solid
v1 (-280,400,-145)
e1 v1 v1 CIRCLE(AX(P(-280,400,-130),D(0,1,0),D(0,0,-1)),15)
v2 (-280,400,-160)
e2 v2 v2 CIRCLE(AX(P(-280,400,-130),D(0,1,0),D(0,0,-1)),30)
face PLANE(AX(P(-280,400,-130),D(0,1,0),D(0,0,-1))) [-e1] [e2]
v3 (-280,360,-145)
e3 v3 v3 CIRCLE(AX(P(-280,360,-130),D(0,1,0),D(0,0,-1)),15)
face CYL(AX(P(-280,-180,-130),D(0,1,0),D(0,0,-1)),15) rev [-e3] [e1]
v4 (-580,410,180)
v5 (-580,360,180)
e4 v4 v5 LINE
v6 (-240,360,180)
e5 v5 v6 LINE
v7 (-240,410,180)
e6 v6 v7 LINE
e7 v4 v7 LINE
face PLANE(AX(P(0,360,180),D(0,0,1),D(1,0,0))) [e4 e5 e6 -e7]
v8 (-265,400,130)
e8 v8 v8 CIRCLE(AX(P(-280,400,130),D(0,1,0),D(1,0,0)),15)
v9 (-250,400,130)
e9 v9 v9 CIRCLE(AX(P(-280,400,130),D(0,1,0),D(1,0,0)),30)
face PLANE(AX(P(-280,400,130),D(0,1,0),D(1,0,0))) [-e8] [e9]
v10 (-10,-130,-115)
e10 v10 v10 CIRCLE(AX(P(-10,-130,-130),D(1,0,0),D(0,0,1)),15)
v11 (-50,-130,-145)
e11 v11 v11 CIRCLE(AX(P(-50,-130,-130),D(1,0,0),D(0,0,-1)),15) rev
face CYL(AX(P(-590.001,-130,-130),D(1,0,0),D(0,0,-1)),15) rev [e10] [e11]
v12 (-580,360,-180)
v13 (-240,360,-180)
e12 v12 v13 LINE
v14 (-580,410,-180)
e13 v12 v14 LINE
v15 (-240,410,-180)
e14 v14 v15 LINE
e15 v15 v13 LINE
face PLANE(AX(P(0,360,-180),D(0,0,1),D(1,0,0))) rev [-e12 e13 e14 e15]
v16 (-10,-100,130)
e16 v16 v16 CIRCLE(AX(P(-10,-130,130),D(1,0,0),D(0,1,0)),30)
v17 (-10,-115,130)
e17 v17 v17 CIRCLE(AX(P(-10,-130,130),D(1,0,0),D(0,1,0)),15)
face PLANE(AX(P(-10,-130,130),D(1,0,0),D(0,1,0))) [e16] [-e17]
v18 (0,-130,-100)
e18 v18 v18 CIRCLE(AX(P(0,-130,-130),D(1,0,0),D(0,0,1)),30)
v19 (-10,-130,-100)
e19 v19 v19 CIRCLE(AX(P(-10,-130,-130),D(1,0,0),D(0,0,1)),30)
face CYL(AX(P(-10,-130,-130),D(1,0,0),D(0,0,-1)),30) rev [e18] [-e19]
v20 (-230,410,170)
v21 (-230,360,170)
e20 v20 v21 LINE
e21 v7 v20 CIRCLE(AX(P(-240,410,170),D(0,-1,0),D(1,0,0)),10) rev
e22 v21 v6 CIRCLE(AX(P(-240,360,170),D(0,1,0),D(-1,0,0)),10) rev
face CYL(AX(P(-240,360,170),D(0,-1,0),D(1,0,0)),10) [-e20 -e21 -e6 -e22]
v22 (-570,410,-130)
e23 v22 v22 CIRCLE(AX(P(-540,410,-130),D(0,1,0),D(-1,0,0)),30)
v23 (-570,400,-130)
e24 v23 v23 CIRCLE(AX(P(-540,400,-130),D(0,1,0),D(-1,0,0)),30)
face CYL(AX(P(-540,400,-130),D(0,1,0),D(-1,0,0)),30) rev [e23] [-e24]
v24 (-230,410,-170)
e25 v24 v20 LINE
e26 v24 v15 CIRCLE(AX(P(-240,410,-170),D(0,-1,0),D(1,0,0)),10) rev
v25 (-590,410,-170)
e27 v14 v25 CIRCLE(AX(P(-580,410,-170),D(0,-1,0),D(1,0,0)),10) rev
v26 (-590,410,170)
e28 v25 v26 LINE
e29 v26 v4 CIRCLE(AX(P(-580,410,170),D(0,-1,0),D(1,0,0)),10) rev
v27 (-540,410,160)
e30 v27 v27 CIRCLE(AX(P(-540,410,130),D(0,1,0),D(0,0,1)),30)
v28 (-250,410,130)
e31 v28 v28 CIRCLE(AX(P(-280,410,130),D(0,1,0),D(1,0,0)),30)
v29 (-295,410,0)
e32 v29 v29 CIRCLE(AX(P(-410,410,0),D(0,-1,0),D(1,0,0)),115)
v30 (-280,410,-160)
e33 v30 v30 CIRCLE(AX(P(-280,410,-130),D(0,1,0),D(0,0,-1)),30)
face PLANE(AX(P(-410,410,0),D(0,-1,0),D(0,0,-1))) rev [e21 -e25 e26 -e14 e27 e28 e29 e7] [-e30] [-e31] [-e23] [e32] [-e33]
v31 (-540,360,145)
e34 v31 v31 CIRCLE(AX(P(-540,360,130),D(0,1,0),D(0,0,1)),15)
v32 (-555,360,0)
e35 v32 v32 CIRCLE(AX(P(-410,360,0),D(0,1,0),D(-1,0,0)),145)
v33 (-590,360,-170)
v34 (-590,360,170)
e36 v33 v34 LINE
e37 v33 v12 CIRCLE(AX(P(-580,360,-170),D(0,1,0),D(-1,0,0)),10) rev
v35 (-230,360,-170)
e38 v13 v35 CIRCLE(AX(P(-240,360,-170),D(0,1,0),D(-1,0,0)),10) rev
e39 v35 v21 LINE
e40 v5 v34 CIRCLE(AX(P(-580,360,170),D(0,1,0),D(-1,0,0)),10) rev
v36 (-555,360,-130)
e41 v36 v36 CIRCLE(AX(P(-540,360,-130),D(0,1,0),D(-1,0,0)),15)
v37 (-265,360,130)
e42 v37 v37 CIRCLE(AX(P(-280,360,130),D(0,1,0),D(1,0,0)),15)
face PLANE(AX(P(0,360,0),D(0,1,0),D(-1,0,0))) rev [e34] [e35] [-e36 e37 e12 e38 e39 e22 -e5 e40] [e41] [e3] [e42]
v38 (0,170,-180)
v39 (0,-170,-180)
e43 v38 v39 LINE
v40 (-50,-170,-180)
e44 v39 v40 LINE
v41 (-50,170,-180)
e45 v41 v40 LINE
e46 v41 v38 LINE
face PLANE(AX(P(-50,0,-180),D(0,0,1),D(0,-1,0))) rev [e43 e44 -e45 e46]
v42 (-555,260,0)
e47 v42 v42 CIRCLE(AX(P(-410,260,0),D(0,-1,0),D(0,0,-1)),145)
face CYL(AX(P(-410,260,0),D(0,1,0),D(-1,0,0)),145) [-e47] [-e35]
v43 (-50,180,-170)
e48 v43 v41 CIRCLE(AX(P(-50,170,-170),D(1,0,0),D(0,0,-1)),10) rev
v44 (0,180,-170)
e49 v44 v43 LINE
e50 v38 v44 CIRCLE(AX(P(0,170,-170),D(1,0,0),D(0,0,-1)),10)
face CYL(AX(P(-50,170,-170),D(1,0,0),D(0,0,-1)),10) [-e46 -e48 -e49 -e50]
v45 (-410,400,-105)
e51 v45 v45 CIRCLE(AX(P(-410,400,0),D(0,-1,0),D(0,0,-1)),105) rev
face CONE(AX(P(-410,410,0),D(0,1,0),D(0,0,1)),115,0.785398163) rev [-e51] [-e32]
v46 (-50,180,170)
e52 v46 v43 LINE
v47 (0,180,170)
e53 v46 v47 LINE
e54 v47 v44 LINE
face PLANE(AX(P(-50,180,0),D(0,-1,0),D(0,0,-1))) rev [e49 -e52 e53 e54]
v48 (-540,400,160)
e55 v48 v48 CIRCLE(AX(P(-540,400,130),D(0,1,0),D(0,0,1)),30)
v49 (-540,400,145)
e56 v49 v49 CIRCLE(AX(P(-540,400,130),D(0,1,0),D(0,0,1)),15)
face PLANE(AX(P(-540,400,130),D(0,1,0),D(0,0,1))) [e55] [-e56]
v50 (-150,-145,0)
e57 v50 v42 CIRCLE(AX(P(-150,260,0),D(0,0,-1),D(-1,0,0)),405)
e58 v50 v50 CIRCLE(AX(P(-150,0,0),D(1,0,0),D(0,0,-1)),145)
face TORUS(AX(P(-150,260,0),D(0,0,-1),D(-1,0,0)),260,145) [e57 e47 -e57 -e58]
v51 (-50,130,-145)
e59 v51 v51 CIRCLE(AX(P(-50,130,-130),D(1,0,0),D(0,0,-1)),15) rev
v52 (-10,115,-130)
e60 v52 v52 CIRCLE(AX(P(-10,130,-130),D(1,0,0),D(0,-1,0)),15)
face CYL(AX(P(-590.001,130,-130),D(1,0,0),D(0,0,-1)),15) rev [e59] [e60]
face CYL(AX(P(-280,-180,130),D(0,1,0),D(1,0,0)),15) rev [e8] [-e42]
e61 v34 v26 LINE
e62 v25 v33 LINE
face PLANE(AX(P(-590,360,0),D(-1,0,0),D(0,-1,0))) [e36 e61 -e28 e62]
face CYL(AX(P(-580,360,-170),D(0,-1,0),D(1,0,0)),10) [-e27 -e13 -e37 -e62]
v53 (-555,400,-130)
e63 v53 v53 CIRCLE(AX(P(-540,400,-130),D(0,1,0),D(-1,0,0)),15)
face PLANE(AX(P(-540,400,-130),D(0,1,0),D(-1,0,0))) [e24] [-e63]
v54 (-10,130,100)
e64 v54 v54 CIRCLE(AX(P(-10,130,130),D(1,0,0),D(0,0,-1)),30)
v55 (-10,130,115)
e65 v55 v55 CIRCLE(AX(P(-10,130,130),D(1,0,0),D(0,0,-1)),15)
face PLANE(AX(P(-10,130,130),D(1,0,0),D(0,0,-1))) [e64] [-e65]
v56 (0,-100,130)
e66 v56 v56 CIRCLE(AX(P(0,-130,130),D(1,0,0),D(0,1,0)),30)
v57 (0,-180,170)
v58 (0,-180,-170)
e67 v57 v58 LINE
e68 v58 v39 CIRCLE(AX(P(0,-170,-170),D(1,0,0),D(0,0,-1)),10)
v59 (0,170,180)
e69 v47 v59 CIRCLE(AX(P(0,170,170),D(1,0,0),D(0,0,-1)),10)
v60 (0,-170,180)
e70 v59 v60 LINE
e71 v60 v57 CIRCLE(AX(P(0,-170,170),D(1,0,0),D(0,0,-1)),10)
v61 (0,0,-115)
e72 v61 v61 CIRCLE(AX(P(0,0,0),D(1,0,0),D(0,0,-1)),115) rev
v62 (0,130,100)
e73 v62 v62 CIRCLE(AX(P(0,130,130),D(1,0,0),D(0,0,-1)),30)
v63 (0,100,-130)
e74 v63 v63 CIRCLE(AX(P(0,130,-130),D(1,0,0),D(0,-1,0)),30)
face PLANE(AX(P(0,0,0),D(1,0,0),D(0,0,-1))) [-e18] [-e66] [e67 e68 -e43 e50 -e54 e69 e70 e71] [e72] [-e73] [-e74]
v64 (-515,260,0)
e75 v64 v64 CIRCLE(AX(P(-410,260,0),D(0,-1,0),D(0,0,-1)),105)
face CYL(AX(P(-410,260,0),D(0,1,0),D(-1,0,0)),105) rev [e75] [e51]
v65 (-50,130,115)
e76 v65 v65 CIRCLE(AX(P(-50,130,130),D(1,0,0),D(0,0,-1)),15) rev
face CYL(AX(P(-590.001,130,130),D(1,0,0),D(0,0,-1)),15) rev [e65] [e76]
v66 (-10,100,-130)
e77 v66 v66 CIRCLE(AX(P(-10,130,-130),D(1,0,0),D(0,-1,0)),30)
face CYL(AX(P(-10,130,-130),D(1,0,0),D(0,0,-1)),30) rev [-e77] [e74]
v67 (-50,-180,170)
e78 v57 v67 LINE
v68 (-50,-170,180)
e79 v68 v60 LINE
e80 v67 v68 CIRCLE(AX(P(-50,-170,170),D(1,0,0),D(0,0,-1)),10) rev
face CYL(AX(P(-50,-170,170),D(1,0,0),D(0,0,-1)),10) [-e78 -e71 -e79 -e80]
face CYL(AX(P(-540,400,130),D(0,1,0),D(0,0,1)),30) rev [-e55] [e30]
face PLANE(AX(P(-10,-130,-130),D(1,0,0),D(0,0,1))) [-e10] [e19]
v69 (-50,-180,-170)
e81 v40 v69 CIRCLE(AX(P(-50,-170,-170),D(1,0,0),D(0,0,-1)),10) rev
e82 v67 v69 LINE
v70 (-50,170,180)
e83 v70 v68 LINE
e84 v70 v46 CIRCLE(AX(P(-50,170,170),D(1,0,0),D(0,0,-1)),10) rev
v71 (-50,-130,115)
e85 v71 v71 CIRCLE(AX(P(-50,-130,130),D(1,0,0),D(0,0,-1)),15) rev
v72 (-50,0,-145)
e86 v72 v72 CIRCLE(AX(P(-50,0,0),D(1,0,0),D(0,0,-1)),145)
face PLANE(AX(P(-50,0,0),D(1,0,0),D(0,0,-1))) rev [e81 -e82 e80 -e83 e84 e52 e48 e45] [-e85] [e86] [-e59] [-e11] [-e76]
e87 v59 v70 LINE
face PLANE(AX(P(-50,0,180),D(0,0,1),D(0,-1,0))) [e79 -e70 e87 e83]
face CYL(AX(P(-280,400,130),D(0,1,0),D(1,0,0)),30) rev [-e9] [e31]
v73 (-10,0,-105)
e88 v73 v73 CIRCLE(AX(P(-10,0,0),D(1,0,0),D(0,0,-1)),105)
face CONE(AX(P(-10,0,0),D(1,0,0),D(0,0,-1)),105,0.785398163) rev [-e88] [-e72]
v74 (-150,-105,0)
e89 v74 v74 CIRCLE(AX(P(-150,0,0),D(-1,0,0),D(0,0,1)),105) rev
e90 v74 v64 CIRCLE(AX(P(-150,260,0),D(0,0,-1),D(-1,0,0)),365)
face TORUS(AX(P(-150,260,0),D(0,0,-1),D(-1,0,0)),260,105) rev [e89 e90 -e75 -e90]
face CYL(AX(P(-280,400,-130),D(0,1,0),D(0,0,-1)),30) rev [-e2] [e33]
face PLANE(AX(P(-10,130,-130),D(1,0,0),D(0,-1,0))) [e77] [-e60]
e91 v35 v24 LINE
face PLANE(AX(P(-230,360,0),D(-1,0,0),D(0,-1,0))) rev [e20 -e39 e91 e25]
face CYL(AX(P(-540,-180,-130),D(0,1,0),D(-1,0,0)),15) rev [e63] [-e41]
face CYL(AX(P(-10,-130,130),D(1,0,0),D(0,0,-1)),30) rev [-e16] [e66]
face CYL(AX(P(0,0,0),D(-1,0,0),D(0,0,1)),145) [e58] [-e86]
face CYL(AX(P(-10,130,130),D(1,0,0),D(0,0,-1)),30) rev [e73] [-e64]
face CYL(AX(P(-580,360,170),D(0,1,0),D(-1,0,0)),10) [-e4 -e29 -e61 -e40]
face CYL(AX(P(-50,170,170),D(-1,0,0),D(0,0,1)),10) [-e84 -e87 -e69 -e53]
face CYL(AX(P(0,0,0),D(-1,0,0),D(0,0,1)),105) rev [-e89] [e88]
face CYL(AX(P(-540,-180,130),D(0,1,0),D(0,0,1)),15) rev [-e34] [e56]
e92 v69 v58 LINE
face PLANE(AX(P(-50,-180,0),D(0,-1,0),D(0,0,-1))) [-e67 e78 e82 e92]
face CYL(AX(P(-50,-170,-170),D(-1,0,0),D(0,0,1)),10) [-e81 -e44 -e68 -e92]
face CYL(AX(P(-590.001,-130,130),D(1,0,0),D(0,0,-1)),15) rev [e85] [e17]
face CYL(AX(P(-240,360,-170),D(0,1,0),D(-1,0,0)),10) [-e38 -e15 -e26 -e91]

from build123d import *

# Parameters (mm, degrees)
SKETCH2_R                 = 145
SKETCH2_R_2               = 105
BOSS_EXTRUDE1_START       = -50
SKETCH3_W                 = 360
SKETCH3_H                 = 360
SKETCH3_R                 = 145
BOSS_EXTRUDE1_DEPTH       = 50
FILLET1_R                 = 10
SKETCH4_W                 = 360
SKETCH4_H                 = 360
SKETCH4_R                 = 145
BOSS_EXTRUDE2_DEPTH       = 50
FILLET2_R                 = 10
SKETCH5_R                 = 30
CUT_EXTRUDE1_DEPTH        = 10
CUT_EXTRUDE2_REACH        = 734.735
SKETCH7_R                 = 15
CIRPATTERN1_COUNT         = 4
SKETCH8_R                 = 30
CUT_EXTRUDE3_DEPTH        = 10
SKETCH9_R                 = 15
CUT_EXTRUDE4_DEPTH        = 847.69947443
CIRPATTERN4_START         = 360
CIRPATTERN4_OUTLINE_R     = 15
CIRPATTERN4_DEPTH         = 50
CIRPATTERN4_START_2       = 400
CIRPATTERN4_2_OUTLINE_R   = 30
CIRPATTERN4_2_OUTLINE_R_2 = 15
CIRPATTERN4_2_DEPTH       = 10
CHAMFER1_SIZE             = 10
CHAMFER2_SIZE             = 10


# Read off the part's stored shape, not the designer's step: CirPattern4
with BuildPart() as part:
    # Sweep-Thin1: sweep along a path in Sketch1
    with BuildLine(Plane.XY) as sweep_thin1_path:
        Line((0, 0), (-150, 0))
        ThreePointArc((-150, 0), (-333.847763109, 76.152236891), (-410, 260))
        Line((-410, 260), (-410, 410))
    # Sketch2 → Sweep-Thin1 (sweep)
    with BuildSketch(Plane(origin=(0, 0, 0), x_dir=(0, 0, -1), z_dir=(1, 0, 0))):
        Circle(SKETCH2_R)
        Circle(SKETCH2_R_2, mode=Mode.SUBTRACT)
    sweep(path=sweep_thin1_path.line)

    # Sketch3 → Boss-Extrude1 (add)
    with BuildSketch(Plane(origin=(0, 0, 0), x_dir=(0, 0, -1), z_dir=(1, 0, 0)).offset(BOSS_EXTRUDE1_START)):
        Rectangle(SKETCH3_W, SKETCH3_H)
        with Locations(Location((0, 0, 0), (0, 0, 270))):
            Circle(SKETCH3_R, mode=Mode.SUBTRACT)
    extrude(amount=BOSS_EXTRUDE1_DEPTH)

    # Fillet1
    fillet1_edges = [part.edges().sort_by_distance(p)[0] for p in [
        (-25, 180, -180),
        (-25, -180, -180),
        (-25, -180, 180),
        (-25, 180, 180),
    ]]
    fillet(fillet1_edges, radius=FILLET1_R)

    # Sketch4 → Boss-Extrude2 (add)
    with BuildSketch(Plane(origin=(0, 410, 0), x_dir=(1, 0, 0), z_dir=(0, 1, 0))):
        with Locations((-410, 0)):
            Rectangle(SKETCH4_W, SKETCH4_H)
        with Locations(Location((-410, 0, 0), (0, 0, 180))):
            Circle(SKETCH4_R, mode=Mode.SUBTRACT)
    extrude(amount=-BOSS_EXTRUDE2_DEPTH)

    # Fillet2
    fillet2_edges = [part.edges().sort_by_distance(p)[0] for p in [
        (-230, 385, -180),
        (-230, 385, 180),
        (-590, 385, 180),
        (-590, 385, -180),
    ]]
    fillet(fillet2_edges, radius=FILLET2_R)

    # Sketch5 → Cut-Extrude1 (cut)
    with BuildSketch(Plane(origin=(0, 0, 0), x_dir=(0, 0, -1), z_dir=(1, 0, 0))):
        with Locations((-130, 130)):
            Circle(SKETCH5_R)
    cut_extrude1 = extrude(amount=-CUT_EXTRUDE1_DEPTH, mode=Mode.SUBTRACT)

    # Sketch7 → Cut-Extrude2 (cut, up to next)
    with BuildSketch(Plane(origin=(-10, 0, 0), x_dir=(0, 0, -1), z_dir=(1, 0, 0)), mode=Mode.PRIVATE) as cut_extrude2_sk1:
        with Locations((-130, 130)):
            Circle(SKETCH7_R)
    cut_extrude2_tool1 = extrude(cut_extrude2_sk1.sketch, amount=-CUT_EXTRUDE2_REACH, mode=Mode.PRIVATE) & part.part
    cut_extrude2 = cut_extrude2_tool1.solids().sort_by_distance((-10, 130, 130))[0]
    add(cut_extrude2, mode=Mode.SUBTRACT)

    # CirPattern1: Cut-Extrude1, Cut-Extrude2 ×4 about axis
    cirpattern1_axis = Axis((0, 0, 0), (1, 0, 0))
    add([cut_extrude1.rotate(cirpattern1_axis, i * 360 / CIRPATTERN1_COUNT) for i in range(1, CIRPATTERN1_COUNT)], mode=Mode.SUBTRACT)
    add([cut_extrude2.rotate(cirpattern1_axis, i * 360 / CIRPATTERN1_COUNT) for i in range(1, CIRPATTERN1_COUNT)], mode=Mode.SUBTRACT)

    # Sketch8 → Cut-Extrude3 (cut)
    with BuildSketch(Plane(origin=(0, 410, 0), x_dir=(1, 0, 0), z_dir=(0, 1, 0))):
        with Locations(Location((-540, 130, 0), (0, 0, 180))):
            Circle(SKETCH8_R)
    extrude(amount=-CUT_EXTRUDE3_DEPTH, mode=Mode.SUBTRACT)

    # Sketch9 → Cut-Extrude4 (cut, through all)
    with BuildSketch(Plane(origin=(0, 400, 0), x_dir=(1, 0, 0), z_dir=(0, 1, 0))):
        with Locations(Location((-540, 130, 0), (0, 0, 180))):
            Circle(SKETCH9_R)
    extrude(amount=-CUT_EXTRUDE4_DEPTH, mode=Mode.SUBTRACT)

    # CirPattern4 outline → CirPattern4 (cut)
    with BuildSketch(Plane(origin=(0, 0, 0), x_dir=(1, 0, 0), z_dir=(0, 1, 0)).offset(CIRPATTERN4_START)):
        with Locations((-280, 130)):
            Circle(CIRPATTERN4_OUTLINE_R)
        with Locations((-280, -130)):
            Circle(CIRPATTERN4_OUTLINE_R)
        with Locations((-540, -130)):
            Circle(CIRPATTERN4_OUTLINE_R)
    extrude(amount=CIRPATTERN4_DEPTH, mode=Mode.SUBTRACT)

    # CirPattern4 2 outline → CirPattern4 2 (cut)
    # profile 1 of 3: a face of its own
    with BuildSketch(Plane(origin=(0, 0, 0), x_dir=(1, 0, 0), z_dir=(0, 1, 0)).offset(CIRPATTERN4_START_2)):
        with Locations((-280, 130)):
            Circle(CIRPATTERN4_2_OUTLINE_R)
        with Locations((-280, 130)):
            Circle(CIRPATTERN4_2_OUTLINE_R_2, mode=Mode.SUBTRACT)
    # profile 2 of 3: a face of its own
    with BuildSketch(Plane(origin=(0, 0, 0), x_dir=(1, 0, 0), z_dir=(0, 1, 0)).offset(CIRPATTERN4_START_2)):
        with Locations((-280, -130)):
            Circle(CIRPATTERN4_2_OUTLINE_R)
        with Locations((-280, -130)):
            Circle(CIRPATTERN4_2_OUTLINE_R_2, mode=Mode.SUBTRACT)
    # profile 3 of 3: a face of its own
    with BuildSketch(Plane(origin=(0, 0, 0), x_dir=(1, 0, 0), z_dir=(0, 1, 0)).offset(CIRPATTERN4_START_2)):
        with Locations((-540, -130)):
            Circle(CIRPATTERN4_2_OUTLINE_R)
        with Locations((-540, -130)):
            Circle(CIRPATTERN4_2_OUTLINE_R_2, mode=Mode.SUBTRACT)
    extrude(amount=CIRPATTERN4_2_DEPTH, mode=Mode.SUBTRACT)

    # Chamfer1
    chamfer1_edges = [part.edges().sort_by_distance(p)[0] for p in [
        (0, 0, 105),
    ]]
    chamfer(chamfer1_edges, length=CHAMFER1_SIZE)

    # Chamfer2
    chamfer2_edges = [part.edges().sort_by_distance(p)[0] for p in [
        (-410, 410, 105),
    ]]
    chamfer(chamfer2_edges, length=CHAMFER2_SIZE)


solid = part.part
